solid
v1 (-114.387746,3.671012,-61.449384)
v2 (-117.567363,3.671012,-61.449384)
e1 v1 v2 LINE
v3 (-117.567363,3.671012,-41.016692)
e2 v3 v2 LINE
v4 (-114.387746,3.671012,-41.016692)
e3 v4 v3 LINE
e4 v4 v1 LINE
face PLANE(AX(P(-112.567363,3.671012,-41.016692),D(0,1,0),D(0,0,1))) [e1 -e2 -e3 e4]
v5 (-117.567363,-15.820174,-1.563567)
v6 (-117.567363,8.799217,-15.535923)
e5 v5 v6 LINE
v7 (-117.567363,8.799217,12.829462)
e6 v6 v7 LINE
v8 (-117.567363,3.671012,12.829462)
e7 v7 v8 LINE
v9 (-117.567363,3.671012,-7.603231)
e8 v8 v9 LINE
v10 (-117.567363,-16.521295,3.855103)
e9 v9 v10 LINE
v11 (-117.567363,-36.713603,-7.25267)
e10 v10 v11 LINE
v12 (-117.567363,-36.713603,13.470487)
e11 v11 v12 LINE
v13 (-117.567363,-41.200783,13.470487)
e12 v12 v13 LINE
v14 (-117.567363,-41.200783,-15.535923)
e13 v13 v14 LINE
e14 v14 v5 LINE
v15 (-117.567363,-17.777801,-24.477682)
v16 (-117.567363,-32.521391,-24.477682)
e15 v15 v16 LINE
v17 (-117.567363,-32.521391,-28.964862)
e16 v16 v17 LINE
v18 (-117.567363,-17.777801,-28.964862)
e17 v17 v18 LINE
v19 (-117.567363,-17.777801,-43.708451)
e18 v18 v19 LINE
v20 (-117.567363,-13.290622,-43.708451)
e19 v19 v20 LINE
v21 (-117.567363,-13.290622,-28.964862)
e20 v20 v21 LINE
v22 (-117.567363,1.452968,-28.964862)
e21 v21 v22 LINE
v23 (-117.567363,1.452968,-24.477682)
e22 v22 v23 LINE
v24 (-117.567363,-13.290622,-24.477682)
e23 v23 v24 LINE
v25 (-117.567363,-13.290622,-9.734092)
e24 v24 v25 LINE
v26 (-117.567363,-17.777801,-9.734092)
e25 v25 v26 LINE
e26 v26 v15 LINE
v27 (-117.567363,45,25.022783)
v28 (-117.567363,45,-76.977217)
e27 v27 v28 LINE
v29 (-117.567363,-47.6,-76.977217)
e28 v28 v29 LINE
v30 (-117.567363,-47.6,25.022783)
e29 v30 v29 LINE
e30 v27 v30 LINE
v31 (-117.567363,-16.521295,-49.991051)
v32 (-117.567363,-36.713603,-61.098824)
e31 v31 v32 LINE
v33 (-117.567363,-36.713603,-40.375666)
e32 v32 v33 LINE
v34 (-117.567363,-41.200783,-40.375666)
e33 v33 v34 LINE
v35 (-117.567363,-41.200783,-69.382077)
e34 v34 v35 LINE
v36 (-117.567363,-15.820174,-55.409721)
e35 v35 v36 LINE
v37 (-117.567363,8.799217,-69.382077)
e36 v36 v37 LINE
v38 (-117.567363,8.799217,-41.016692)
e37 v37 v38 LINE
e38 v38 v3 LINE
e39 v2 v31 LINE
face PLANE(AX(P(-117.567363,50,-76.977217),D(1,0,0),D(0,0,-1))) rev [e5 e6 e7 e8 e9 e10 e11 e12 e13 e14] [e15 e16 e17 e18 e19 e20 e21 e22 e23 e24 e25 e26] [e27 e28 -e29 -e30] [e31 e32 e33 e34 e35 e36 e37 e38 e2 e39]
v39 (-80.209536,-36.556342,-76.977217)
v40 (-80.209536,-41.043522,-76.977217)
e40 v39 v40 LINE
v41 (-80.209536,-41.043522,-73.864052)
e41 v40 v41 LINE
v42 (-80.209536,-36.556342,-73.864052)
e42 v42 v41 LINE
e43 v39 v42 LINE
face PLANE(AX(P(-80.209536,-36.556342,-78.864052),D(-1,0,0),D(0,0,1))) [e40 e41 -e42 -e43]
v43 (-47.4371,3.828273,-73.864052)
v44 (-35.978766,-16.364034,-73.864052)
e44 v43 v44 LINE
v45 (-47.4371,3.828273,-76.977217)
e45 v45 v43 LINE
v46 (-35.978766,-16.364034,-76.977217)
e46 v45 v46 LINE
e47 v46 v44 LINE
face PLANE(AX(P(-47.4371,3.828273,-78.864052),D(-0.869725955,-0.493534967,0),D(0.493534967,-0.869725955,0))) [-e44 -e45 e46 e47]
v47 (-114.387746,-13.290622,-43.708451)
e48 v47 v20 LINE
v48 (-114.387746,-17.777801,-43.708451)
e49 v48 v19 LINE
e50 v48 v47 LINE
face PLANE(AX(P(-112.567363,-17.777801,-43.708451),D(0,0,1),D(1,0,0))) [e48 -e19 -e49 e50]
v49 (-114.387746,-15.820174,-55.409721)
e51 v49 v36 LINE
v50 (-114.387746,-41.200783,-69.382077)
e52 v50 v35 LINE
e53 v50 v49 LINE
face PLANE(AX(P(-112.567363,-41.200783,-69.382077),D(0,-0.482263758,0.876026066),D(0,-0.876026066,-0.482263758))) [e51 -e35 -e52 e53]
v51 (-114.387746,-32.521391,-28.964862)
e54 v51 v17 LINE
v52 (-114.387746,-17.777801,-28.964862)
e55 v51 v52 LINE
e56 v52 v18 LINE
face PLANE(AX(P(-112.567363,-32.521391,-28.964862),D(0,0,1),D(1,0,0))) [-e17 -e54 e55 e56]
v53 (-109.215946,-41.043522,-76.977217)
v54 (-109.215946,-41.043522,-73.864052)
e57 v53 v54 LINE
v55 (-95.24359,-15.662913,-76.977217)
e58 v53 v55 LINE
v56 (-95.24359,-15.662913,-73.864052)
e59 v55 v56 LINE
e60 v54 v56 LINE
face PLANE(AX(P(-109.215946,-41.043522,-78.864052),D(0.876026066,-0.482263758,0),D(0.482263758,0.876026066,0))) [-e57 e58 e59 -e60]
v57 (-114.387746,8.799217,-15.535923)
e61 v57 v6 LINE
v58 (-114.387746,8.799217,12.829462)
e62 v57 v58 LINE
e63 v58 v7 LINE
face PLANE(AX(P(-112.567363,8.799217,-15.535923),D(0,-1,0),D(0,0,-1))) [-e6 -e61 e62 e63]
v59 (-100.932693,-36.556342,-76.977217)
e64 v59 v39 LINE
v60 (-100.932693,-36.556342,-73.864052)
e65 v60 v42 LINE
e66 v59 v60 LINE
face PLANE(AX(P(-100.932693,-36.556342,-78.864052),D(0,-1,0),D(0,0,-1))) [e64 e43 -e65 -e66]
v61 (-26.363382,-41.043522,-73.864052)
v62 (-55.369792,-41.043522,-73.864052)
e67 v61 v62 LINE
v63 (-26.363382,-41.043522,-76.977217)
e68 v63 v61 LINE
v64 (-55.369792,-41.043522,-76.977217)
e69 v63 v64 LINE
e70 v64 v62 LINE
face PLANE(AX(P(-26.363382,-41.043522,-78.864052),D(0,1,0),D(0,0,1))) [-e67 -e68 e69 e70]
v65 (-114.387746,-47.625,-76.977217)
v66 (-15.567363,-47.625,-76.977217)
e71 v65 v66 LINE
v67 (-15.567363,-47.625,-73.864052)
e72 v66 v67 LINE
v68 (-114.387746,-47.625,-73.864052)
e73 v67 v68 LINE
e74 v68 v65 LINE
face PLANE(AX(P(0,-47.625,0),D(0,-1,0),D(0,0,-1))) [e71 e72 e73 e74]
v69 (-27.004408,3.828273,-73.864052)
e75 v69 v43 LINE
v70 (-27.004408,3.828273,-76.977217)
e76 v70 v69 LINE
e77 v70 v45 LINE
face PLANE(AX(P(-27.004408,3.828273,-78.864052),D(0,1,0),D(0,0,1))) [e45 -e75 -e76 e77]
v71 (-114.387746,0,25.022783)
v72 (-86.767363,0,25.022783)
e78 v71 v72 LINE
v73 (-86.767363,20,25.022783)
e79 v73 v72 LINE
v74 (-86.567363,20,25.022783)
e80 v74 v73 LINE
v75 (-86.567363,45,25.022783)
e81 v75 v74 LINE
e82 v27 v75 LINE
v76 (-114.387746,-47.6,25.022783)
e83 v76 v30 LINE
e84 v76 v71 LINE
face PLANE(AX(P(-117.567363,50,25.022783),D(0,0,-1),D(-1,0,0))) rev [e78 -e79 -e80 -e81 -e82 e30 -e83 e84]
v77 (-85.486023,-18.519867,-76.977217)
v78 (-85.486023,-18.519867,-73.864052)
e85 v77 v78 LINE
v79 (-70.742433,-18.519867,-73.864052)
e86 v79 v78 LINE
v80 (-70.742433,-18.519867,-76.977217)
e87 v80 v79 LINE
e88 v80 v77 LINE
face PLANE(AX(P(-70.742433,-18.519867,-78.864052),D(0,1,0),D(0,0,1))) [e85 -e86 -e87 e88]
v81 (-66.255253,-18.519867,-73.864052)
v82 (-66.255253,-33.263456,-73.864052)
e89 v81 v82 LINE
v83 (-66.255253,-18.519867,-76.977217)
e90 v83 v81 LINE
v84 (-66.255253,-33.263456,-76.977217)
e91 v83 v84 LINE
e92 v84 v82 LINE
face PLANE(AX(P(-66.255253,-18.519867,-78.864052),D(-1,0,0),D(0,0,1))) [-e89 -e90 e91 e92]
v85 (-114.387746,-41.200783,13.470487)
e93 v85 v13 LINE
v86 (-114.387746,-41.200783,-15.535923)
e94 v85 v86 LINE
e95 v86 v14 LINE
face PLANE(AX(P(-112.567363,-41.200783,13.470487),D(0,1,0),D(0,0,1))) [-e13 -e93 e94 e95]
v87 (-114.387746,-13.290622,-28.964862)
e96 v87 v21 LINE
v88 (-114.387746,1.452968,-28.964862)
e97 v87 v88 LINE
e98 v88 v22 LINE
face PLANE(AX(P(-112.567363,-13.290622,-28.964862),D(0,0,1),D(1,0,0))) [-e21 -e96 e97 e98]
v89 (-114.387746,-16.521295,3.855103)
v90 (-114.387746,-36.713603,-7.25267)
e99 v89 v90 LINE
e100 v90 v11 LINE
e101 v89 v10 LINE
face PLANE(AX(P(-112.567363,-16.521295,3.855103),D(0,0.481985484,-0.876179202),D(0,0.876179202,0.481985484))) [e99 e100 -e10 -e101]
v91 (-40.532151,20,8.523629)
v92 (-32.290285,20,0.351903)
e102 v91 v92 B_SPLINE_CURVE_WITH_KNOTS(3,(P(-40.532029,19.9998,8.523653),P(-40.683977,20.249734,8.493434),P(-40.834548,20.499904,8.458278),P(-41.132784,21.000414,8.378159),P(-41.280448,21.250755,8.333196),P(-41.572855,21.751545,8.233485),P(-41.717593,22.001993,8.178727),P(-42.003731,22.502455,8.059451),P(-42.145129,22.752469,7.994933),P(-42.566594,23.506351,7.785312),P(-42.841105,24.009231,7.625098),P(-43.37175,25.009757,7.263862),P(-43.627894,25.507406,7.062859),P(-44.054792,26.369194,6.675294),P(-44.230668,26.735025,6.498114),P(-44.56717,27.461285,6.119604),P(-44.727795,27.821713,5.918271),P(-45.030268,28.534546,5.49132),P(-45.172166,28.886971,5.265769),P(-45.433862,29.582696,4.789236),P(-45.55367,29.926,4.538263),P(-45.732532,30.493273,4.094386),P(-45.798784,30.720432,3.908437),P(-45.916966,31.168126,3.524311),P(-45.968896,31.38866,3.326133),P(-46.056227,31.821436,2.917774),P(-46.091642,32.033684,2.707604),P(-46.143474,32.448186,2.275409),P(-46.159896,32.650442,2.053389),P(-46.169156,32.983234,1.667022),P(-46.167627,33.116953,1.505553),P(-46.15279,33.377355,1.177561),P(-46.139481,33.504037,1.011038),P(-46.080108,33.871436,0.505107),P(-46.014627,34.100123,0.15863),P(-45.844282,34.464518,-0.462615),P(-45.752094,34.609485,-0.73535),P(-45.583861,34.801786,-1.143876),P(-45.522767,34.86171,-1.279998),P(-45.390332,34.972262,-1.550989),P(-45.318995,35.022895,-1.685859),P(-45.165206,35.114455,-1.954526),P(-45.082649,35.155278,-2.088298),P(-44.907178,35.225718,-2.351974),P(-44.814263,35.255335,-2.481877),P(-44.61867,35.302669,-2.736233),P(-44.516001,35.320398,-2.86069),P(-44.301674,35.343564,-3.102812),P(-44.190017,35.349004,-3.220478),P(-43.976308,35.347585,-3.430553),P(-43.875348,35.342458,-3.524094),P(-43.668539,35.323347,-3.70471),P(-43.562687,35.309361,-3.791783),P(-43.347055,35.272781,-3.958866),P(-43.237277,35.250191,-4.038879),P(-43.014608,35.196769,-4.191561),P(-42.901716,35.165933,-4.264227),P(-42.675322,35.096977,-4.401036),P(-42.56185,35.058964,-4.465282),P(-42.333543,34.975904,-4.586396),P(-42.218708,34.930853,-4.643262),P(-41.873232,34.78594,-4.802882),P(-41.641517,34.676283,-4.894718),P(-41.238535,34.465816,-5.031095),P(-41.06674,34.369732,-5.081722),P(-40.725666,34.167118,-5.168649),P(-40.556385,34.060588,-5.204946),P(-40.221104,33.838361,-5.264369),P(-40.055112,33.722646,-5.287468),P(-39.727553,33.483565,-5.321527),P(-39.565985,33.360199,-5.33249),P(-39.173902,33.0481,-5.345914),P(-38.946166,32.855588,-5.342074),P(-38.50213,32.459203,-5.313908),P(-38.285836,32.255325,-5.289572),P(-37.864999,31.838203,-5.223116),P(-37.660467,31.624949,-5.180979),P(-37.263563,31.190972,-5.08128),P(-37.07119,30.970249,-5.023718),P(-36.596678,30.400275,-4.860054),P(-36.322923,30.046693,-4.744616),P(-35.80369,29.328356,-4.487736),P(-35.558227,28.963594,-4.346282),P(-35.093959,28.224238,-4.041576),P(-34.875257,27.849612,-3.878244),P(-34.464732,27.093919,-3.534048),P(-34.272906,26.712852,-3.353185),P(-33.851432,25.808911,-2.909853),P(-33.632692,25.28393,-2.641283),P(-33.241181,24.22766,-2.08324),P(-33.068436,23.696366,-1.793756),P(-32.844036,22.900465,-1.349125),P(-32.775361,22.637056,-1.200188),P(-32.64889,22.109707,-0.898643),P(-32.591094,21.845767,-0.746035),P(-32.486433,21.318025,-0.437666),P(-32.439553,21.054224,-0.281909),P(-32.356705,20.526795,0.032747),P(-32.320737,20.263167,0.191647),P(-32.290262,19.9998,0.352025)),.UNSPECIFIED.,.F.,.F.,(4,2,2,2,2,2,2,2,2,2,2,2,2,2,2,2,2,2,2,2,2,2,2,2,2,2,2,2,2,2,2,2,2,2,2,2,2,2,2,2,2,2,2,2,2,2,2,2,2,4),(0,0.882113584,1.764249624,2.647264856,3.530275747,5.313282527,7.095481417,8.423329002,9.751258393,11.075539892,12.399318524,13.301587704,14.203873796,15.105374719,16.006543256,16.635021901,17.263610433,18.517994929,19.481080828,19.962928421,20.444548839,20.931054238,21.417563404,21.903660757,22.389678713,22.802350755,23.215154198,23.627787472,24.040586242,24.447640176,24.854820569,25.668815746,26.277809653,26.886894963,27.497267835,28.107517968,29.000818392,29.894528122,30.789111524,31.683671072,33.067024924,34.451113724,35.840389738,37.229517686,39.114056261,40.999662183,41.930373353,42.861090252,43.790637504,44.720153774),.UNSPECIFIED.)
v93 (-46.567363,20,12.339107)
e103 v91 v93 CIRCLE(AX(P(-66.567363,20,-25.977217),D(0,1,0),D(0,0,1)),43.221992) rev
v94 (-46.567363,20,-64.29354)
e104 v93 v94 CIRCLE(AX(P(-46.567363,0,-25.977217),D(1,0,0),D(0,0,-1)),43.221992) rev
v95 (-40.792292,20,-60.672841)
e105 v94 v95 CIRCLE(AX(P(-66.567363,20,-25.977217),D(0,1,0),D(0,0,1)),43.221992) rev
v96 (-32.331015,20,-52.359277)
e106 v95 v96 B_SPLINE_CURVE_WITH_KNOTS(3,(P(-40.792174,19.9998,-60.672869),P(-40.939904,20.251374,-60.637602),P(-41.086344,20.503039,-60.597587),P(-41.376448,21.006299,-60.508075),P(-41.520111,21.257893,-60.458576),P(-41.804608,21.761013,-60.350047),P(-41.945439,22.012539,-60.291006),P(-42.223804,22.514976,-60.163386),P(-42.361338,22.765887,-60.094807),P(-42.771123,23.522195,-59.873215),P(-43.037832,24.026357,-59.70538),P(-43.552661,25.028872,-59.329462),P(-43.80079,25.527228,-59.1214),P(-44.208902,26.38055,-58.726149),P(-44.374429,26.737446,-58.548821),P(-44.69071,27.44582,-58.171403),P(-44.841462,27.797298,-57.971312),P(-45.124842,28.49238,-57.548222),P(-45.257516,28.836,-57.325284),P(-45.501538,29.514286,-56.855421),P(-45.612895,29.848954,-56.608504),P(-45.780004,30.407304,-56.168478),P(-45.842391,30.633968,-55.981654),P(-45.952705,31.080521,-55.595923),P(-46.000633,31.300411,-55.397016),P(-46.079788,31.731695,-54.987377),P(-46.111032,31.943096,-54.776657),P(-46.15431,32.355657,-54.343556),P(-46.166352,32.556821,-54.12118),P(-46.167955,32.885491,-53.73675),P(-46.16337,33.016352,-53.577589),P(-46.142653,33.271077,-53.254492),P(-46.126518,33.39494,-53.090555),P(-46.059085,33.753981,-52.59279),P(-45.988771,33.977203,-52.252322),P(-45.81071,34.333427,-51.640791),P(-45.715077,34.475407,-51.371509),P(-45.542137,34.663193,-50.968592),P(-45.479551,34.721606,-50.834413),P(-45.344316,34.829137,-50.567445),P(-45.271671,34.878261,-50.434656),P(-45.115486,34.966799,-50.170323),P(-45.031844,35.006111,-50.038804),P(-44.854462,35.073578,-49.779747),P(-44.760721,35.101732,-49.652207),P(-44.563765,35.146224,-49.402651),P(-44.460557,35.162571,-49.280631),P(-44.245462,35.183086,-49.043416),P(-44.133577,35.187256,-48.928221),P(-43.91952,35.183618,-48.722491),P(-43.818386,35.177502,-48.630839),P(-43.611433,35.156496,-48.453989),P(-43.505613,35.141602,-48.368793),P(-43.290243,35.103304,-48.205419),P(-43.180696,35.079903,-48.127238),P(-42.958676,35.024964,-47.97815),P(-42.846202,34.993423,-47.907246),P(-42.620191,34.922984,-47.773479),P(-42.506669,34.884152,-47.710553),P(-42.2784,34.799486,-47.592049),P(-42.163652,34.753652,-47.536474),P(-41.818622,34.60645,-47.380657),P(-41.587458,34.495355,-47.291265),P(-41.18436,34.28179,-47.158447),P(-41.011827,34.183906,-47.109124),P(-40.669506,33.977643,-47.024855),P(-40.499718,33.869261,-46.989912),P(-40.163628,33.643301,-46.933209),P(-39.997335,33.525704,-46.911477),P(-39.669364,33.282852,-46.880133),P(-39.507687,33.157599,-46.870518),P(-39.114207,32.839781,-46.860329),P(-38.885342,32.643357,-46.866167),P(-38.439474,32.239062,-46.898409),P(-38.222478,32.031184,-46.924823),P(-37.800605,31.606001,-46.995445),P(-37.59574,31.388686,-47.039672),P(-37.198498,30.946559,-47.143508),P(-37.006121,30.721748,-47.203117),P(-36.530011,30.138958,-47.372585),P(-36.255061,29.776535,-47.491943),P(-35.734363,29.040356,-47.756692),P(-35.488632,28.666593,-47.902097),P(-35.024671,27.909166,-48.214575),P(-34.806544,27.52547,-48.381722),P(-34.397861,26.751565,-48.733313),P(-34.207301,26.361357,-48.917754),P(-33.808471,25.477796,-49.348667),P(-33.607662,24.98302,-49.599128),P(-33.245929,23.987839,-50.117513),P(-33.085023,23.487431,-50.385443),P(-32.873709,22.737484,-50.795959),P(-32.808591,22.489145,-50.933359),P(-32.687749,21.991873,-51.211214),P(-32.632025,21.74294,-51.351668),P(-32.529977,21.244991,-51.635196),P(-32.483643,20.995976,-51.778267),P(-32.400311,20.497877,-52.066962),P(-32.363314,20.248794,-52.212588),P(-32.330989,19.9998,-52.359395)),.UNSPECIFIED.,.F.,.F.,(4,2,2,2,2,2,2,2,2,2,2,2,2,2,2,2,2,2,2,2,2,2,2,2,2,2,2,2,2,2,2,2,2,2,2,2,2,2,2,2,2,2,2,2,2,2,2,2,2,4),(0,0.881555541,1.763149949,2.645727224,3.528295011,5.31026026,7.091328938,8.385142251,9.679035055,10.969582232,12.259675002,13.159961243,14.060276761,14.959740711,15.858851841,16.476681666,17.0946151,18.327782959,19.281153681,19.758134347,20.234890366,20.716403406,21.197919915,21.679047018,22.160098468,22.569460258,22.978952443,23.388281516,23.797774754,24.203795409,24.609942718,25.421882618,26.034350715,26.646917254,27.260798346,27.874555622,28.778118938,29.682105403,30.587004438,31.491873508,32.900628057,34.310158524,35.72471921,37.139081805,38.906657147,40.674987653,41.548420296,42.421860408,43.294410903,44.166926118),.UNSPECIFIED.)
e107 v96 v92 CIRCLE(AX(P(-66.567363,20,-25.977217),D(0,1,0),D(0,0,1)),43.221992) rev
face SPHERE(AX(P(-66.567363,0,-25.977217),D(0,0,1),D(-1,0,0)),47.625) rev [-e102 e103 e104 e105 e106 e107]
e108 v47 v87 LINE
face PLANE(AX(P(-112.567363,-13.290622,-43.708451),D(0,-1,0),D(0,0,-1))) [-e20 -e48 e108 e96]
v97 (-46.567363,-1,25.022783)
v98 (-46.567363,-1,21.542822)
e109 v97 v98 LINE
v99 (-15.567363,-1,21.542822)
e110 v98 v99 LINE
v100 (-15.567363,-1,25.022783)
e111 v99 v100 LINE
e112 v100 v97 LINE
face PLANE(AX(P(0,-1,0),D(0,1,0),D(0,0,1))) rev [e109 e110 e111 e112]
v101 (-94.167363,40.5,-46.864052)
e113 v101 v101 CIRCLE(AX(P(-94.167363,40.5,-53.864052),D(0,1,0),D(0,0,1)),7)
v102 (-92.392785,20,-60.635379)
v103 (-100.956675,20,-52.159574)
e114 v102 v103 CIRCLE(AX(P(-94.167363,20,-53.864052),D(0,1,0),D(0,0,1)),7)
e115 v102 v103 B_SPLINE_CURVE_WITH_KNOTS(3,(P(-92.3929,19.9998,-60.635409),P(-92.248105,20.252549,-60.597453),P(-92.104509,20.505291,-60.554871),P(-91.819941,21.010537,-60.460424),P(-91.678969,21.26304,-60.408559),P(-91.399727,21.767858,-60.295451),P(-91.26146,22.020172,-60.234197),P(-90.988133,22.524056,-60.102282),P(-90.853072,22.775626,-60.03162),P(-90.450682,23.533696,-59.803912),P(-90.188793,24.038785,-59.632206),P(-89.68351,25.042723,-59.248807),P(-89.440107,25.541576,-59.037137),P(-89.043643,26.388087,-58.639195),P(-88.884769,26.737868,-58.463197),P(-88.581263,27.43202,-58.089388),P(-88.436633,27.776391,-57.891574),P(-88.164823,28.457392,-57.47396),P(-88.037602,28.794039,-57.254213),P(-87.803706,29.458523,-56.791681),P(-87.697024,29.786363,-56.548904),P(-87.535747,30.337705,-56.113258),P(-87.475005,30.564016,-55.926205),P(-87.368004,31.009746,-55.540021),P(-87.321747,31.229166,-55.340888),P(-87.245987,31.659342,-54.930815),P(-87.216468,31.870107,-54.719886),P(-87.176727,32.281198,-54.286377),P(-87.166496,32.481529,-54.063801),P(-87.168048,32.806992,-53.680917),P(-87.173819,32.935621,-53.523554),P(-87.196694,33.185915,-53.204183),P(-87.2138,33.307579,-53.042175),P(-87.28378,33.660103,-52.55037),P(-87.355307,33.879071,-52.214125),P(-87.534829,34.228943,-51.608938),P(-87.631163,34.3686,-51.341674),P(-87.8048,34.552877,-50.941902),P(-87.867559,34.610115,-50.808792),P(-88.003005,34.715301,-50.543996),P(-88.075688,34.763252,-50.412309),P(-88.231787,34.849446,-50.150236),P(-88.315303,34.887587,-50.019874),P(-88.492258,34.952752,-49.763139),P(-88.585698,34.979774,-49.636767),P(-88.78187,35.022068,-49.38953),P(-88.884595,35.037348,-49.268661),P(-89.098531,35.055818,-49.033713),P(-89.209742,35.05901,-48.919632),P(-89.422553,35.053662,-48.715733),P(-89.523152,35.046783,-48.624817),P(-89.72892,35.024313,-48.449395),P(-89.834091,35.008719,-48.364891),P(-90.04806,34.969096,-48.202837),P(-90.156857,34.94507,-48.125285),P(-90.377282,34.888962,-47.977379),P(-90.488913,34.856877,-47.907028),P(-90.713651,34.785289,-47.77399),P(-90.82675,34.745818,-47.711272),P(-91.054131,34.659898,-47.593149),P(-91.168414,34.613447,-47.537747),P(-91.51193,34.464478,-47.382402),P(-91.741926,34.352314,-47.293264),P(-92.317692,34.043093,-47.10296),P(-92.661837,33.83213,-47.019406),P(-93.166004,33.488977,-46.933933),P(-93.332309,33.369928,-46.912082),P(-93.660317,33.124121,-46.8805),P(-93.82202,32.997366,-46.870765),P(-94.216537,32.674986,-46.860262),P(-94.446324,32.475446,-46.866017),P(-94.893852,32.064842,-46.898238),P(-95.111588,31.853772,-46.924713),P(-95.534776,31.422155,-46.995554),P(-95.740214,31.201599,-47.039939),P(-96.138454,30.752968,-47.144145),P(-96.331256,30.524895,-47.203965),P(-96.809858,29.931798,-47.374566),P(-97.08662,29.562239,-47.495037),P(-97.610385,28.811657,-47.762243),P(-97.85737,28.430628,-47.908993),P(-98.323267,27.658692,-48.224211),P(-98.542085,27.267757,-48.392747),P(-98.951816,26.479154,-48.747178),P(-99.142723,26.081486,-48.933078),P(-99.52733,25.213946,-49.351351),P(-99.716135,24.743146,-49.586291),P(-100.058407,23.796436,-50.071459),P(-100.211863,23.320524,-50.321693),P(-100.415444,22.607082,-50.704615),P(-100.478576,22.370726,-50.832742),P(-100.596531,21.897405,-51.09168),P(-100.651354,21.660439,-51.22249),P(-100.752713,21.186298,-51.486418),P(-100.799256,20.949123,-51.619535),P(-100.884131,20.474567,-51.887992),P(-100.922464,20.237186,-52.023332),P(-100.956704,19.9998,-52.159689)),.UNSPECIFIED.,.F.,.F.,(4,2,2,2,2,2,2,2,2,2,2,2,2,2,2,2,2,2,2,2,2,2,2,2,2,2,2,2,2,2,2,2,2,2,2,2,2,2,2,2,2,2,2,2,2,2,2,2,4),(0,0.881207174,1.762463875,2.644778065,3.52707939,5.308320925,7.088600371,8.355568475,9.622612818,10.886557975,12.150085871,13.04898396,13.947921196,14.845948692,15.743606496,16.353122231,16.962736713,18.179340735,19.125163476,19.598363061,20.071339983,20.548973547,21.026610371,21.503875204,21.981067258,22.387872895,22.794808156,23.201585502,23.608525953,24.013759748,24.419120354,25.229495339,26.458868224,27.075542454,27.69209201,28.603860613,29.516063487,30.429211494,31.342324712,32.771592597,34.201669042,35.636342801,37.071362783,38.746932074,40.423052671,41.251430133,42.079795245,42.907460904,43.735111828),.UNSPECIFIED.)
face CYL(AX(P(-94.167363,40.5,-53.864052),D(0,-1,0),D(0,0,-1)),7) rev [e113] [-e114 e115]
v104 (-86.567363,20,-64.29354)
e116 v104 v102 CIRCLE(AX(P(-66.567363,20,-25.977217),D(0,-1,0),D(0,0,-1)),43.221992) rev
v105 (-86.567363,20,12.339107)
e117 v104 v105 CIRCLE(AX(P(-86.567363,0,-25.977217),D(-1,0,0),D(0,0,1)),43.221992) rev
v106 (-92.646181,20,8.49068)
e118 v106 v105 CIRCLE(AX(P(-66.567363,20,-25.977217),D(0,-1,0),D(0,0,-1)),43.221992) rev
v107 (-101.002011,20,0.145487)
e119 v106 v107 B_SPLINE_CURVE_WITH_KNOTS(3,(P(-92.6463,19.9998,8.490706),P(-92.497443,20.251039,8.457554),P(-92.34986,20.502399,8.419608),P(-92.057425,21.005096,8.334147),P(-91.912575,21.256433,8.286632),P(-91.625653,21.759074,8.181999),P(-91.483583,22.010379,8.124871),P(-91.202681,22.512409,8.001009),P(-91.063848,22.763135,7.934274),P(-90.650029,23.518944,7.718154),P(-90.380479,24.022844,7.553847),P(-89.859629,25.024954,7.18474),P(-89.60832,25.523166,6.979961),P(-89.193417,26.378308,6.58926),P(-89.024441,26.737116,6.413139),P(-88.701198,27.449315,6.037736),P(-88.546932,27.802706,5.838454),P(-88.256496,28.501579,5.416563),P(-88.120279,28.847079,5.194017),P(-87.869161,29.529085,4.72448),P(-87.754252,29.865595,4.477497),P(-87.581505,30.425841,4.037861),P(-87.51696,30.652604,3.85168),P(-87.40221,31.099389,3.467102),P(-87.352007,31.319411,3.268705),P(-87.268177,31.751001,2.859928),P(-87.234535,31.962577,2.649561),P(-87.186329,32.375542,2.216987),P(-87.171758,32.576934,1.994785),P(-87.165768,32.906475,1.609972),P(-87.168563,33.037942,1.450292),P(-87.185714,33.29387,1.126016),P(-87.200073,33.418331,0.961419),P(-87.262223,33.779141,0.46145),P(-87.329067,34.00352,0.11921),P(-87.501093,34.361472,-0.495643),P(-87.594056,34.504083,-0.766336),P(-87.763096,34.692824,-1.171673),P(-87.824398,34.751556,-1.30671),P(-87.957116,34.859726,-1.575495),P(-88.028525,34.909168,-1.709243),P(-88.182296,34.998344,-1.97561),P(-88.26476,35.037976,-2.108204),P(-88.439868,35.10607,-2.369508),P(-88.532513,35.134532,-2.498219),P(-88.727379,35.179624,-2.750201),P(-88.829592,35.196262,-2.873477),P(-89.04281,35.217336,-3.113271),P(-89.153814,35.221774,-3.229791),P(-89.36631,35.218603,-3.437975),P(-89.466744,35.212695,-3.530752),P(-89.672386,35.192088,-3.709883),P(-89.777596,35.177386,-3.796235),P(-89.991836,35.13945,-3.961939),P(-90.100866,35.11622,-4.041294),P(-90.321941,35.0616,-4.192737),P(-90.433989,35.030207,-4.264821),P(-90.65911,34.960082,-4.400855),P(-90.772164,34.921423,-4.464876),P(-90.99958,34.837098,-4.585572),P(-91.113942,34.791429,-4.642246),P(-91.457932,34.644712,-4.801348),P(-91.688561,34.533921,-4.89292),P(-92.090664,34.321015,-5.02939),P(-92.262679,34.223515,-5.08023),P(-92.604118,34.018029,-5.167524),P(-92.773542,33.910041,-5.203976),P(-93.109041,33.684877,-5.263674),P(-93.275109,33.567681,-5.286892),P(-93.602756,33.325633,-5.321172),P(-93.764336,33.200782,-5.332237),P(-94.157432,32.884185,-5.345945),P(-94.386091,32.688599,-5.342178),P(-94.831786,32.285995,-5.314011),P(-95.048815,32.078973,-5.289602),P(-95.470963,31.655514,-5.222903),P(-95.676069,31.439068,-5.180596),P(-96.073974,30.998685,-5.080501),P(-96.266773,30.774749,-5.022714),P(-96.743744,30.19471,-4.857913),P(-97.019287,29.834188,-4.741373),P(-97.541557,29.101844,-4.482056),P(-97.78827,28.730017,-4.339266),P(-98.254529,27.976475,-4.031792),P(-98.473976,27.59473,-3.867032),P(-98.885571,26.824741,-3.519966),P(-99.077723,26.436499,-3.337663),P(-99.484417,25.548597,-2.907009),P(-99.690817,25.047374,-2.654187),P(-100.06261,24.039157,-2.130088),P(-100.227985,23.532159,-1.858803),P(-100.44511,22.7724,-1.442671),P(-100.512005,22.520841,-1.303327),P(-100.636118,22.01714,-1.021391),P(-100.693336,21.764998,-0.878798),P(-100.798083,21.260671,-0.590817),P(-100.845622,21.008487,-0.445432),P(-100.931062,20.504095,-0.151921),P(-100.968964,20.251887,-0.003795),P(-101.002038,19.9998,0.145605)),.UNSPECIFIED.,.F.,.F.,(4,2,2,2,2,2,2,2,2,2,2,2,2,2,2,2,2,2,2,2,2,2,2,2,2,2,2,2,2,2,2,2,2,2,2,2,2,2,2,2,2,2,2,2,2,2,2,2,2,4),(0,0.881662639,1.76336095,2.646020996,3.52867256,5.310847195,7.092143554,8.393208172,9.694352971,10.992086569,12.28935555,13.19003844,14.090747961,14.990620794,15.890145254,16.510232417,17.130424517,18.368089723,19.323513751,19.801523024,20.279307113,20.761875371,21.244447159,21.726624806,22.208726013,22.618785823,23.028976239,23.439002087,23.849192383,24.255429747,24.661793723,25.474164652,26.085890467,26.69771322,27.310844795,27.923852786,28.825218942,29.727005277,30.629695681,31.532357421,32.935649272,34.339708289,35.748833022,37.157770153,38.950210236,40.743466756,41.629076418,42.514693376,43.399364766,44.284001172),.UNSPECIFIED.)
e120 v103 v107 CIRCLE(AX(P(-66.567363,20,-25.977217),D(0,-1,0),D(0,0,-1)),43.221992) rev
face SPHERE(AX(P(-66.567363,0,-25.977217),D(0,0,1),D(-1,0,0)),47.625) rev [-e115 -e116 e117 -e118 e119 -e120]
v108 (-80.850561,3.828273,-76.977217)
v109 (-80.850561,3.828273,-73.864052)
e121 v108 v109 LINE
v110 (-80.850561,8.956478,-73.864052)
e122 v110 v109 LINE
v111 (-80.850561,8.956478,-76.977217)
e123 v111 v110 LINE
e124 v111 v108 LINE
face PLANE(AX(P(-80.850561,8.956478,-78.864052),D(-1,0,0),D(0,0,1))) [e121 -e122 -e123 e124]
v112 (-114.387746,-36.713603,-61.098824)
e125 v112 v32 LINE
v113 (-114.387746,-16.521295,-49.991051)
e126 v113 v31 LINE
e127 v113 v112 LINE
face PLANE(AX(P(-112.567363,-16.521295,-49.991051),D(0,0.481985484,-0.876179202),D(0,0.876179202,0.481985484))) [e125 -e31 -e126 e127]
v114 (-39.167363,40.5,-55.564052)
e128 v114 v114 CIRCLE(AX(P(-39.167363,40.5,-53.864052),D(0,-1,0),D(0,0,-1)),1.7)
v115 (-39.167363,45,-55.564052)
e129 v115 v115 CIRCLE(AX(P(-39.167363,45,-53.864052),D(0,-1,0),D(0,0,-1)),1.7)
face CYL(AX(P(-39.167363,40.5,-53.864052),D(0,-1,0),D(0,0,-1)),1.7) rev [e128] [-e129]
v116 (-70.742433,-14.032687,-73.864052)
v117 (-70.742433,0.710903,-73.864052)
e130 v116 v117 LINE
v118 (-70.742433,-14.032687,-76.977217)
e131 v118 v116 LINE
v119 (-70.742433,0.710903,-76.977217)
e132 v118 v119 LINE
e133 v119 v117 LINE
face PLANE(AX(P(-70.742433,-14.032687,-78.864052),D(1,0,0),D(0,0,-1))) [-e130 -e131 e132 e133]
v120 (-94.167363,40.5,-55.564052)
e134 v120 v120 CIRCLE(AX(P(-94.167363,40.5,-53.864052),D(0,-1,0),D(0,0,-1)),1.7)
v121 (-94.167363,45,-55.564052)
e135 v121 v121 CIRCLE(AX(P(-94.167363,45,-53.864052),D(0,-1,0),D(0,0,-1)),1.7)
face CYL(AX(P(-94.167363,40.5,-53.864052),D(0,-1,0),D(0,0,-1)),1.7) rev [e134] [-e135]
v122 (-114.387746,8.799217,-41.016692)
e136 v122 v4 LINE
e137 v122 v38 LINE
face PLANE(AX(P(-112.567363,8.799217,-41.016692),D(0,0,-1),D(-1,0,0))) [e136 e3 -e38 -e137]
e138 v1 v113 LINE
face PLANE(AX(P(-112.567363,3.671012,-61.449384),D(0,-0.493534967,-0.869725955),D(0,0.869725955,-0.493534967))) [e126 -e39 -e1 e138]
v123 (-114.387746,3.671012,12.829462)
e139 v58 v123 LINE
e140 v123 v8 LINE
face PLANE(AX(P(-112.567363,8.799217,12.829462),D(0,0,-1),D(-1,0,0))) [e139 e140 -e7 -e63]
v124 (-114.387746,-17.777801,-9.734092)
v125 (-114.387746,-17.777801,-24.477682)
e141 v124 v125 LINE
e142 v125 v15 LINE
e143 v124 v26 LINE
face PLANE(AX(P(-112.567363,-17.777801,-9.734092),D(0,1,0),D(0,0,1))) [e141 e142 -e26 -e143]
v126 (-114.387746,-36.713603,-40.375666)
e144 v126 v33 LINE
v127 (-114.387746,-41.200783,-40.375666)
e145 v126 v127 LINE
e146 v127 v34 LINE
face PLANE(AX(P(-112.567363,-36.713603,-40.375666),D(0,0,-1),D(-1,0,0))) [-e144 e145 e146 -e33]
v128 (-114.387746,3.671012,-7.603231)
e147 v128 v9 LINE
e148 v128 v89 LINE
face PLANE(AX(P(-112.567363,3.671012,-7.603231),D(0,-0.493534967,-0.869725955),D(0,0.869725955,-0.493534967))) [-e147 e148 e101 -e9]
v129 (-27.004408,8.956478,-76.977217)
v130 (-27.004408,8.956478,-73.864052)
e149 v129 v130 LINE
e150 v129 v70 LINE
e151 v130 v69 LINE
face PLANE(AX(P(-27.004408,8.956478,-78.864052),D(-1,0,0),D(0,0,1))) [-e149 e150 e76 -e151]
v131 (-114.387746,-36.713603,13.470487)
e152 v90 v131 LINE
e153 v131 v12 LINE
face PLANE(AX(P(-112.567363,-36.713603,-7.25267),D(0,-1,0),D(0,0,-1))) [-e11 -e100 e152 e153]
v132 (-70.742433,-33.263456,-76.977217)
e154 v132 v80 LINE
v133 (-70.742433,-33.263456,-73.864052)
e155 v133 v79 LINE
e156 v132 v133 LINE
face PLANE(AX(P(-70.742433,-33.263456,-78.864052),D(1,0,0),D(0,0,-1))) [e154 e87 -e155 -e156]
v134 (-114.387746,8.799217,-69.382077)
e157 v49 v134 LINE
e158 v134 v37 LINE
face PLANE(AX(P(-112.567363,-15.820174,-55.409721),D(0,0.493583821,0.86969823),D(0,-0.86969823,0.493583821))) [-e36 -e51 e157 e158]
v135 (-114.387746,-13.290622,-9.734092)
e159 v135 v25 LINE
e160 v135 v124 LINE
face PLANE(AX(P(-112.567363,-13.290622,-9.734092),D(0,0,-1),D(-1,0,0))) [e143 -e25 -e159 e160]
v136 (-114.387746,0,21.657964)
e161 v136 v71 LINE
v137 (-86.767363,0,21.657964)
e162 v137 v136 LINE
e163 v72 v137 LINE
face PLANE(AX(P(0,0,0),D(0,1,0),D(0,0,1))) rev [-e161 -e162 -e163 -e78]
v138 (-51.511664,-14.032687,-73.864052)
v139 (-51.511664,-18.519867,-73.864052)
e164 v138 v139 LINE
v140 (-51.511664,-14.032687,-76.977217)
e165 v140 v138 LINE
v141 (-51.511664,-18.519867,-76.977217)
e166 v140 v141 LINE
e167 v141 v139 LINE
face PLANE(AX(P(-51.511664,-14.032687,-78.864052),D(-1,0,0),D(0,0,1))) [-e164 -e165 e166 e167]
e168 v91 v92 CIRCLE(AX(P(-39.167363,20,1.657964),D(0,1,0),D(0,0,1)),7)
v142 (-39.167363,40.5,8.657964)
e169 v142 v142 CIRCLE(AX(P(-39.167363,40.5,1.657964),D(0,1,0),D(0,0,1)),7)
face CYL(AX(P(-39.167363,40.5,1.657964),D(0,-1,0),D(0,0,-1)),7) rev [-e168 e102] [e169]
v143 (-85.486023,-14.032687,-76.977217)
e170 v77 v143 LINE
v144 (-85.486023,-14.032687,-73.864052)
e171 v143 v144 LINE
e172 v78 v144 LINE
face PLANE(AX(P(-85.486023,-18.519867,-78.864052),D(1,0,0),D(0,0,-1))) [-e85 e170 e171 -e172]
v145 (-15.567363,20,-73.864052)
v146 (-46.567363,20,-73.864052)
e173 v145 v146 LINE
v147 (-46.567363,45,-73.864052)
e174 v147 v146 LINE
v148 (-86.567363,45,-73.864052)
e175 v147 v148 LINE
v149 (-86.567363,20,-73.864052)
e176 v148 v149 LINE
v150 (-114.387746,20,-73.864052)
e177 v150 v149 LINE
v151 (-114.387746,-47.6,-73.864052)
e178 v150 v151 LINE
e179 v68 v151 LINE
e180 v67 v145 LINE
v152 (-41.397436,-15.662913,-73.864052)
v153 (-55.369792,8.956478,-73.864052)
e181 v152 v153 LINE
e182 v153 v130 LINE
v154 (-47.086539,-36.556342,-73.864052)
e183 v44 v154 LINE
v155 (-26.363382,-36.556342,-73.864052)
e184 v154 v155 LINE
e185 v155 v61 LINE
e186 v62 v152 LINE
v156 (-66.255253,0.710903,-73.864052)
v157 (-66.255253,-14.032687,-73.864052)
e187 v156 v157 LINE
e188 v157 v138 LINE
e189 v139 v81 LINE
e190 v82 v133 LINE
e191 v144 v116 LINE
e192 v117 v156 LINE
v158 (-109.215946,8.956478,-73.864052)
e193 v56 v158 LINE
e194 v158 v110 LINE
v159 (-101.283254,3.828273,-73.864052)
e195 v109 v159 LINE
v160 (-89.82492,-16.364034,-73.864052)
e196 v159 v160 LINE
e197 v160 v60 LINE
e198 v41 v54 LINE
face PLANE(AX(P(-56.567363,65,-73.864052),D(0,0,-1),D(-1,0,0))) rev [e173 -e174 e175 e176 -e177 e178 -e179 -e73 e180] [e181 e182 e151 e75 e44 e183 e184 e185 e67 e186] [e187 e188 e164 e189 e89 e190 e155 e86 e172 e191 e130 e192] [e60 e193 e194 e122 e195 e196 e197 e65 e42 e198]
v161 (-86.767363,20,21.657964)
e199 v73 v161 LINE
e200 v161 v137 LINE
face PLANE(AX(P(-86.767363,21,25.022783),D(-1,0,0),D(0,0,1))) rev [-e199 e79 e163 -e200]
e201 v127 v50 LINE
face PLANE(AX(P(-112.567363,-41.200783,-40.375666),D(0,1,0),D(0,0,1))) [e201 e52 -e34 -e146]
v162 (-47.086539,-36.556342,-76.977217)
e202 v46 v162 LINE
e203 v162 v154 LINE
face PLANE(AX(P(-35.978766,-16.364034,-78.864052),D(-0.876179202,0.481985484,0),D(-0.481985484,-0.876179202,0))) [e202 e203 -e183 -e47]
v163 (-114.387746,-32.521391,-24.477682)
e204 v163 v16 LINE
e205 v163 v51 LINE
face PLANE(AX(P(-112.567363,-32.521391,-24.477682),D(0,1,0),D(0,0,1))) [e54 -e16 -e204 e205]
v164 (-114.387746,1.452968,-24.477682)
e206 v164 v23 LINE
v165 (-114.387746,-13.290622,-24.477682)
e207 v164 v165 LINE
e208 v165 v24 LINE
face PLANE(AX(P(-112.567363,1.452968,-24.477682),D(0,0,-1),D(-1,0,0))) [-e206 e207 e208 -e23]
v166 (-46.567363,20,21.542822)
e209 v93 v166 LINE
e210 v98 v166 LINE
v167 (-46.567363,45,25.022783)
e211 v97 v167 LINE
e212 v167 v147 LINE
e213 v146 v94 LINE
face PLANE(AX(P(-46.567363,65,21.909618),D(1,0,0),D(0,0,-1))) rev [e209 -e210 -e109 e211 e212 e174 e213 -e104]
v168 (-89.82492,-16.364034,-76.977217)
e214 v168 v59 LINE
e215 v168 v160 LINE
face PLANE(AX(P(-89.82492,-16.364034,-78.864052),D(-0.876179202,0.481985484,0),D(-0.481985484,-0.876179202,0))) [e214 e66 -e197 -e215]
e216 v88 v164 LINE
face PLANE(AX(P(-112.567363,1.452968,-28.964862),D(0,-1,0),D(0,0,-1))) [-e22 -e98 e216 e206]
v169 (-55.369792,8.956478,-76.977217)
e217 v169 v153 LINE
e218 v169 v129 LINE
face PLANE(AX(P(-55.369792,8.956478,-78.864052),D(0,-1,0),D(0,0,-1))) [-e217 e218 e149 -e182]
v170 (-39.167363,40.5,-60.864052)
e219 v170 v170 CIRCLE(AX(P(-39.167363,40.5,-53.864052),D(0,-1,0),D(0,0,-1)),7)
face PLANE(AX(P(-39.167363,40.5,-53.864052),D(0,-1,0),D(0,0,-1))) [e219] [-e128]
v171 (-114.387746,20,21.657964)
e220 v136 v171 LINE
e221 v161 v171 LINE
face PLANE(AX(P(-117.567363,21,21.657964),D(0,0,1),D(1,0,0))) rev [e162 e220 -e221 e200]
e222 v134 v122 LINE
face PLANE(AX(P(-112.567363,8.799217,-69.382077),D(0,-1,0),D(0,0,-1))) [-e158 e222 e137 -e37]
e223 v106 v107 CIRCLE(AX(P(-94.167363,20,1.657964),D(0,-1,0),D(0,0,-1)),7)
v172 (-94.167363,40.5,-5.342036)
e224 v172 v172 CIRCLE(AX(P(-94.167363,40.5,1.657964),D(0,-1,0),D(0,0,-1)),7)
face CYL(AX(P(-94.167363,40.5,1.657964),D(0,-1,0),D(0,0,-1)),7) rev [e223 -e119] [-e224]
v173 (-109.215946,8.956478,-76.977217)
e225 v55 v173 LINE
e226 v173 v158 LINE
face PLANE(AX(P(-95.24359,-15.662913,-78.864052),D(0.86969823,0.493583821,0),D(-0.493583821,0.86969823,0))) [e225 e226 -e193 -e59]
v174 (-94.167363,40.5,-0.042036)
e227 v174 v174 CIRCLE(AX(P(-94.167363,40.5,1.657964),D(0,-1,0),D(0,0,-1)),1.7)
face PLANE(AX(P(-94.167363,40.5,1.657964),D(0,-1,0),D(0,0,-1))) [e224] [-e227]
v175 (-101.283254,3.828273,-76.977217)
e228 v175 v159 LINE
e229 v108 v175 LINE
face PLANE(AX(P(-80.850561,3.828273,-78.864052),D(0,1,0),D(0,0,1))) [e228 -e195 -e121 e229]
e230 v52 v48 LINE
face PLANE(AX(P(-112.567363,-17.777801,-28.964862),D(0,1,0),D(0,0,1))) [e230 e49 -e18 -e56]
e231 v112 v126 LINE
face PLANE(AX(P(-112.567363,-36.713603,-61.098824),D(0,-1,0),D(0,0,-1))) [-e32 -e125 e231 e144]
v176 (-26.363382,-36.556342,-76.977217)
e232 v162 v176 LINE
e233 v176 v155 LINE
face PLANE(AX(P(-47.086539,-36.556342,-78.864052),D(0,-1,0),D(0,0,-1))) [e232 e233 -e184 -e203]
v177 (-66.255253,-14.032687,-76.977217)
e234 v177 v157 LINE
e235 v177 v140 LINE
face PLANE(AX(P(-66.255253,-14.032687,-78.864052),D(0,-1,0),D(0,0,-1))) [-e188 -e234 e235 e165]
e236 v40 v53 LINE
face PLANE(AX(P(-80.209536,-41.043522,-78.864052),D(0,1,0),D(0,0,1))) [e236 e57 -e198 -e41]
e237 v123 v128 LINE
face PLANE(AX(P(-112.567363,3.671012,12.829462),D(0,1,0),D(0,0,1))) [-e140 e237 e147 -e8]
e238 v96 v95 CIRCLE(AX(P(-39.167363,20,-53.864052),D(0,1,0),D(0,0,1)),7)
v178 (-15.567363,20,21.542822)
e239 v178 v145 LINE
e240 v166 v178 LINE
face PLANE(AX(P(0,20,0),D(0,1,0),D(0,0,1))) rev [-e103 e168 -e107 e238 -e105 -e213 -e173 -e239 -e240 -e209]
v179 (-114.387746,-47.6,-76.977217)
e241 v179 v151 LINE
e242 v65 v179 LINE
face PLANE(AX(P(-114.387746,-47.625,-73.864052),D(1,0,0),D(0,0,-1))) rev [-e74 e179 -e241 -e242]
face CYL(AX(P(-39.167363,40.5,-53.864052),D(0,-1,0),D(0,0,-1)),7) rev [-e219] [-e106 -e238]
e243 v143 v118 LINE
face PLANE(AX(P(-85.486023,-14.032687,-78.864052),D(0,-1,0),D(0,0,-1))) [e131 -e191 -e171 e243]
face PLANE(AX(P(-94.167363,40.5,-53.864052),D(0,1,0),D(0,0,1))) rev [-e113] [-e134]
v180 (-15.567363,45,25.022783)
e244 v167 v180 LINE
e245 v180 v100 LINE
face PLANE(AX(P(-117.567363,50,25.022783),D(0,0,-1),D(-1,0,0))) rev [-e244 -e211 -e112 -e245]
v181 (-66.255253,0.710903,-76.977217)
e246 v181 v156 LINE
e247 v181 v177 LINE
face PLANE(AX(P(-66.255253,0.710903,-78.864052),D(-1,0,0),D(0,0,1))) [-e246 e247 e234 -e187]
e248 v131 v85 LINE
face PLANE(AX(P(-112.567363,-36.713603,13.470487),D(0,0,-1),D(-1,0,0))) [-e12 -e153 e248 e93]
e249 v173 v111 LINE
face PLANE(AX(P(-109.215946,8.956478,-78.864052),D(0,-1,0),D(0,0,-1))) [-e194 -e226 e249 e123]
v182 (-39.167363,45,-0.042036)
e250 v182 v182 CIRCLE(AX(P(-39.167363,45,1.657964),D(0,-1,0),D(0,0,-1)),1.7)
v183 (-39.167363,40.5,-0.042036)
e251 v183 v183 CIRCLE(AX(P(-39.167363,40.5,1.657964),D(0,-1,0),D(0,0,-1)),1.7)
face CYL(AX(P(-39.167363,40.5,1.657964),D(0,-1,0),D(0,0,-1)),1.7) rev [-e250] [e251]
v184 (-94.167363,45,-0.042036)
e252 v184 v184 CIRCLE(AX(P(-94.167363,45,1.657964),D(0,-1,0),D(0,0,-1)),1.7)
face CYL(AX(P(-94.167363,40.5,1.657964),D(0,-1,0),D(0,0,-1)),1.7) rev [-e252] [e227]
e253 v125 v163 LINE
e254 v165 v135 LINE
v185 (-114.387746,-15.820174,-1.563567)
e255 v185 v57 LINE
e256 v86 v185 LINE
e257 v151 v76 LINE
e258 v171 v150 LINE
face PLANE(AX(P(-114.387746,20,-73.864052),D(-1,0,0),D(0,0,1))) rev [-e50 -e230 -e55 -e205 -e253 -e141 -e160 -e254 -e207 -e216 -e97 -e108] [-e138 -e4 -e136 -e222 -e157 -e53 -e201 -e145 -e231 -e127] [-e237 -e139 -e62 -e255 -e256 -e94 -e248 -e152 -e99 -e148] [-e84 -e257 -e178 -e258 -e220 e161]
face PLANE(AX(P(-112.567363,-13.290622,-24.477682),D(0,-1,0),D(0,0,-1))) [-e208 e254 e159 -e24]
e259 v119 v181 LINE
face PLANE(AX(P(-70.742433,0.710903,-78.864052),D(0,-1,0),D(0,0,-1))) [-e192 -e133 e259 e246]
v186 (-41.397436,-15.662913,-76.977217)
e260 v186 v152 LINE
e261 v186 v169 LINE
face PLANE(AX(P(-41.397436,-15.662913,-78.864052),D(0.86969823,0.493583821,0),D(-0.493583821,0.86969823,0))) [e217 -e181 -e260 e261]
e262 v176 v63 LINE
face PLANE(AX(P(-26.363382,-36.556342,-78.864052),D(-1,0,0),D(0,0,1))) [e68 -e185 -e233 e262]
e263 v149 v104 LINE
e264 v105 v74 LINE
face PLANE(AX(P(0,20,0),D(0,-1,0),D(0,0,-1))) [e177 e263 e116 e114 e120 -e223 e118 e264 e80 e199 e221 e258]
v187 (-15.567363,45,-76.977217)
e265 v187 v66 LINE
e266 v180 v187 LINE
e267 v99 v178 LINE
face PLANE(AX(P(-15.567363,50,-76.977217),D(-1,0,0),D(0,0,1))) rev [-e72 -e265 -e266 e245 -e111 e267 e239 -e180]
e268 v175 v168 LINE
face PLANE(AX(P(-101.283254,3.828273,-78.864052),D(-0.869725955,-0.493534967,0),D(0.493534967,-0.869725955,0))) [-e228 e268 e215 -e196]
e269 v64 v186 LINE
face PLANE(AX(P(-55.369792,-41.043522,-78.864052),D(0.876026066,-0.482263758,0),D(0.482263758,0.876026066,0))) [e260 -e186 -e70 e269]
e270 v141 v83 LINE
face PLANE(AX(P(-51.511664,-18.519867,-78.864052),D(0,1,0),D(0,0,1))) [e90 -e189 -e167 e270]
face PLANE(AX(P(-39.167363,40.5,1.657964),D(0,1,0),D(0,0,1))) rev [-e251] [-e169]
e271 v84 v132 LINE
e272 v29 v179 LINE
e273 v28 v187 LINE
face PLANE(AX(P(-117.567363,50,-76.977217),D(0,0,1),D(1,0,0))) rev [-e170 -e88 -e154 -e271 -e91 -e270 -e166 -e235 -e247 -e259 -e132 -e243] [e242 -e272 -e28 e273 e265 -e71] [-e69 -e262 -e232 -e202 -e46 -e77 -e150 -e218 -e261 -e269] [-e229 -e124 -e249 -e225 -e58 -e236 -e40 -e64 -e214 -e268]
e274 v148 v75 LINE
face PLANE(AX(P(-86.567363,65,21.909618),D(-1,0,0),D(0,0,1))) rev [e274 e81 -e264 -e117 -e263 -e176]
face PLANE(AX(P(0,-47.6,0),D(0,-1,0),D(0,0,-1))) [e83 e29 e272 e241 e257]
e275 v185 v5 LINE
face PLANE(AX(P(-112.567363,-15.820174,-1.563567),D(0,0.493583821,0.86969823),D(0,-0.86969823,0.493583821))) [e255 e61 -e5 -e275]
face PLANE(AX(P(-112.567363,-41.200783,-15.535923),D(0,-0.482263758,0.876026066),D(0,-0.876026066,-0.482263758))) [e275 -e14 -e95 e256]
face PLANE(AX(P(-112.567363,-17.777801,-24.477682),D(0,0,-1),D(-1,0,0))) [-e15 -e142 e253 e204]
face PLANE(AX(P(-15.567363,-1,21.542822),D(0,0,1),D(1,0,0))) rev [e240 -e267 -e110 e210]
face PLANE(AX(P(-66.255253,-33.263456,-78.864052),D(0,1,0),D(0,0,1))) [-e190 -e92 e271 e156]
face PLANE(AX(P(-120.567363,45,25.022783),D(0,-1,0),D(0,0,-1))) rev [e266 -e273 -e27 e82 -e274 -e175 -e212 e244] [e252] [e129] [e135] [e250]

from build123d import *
from build123d.topology import SkipClean

# Parameters (mm, degrees)
SKETCH1_W                   = 102
SKETCH1_H                   = 102
BOSS_EXTRUDE1_DEPTH         = 50
CUT_EXTRUDE_THIN1_OUTLINE_W = 40
CUT_EXTRUDE_THIN1_OUTLINE_H = 95.773670058
CUT_EXTRUDE_THIN1_DEPTH     = 50
SKETCH4_W                   = 40
SKETCH4_H                   = 6.202657501
CUT_EXTRUDE3_DEPTH          = 54
SKETCH5_W                   = 33.817621941
SKETCH5_H                   = 102.594578927
CUT_EXTRUDE4_DEPTH          = 20
SKETCH6_W                   = 27.820383201
SKETCH6_H                   = 98.886835029
CUT_EXTRUDE5_DEPTH          = 20
SKETCH7_W                   = 30.8
SKETCH7_H                   = 3.364819678
BOSS_EXTRUDE2_DEPTH         = 21
SKETCH9_W                   = 31
SKETCH9_H                   = 3.479961613
BOSS_EXTRUDE4_DEPTH         = 21
SKETCH11_W                  = 98.820383201
SKETCH11_H                  = 3.113164971
BOSS_EXTRUDE6_DEPTH         = 47.625
SKETCH14_W                  = 102
SKETCH14_H                  = 5
CUT_EXTRUDE7_DEPTH          = 105
SKETCH17_R                  = 7
CUT_EXTRUDE12_DEPTH         = 20.5
M3_CLEARANCE_HOLE1_D        = 3.4
SKETCH22_W                  = 3.179616799
SKETCH22_H                  = 102
BOSS_EXTRUDE7_DEPTH         = 47.6
CUT_EXTRUDE13_DEPTH         = 5
CUT_EXTRUDE14_DEPTH         = 5
CUT_EXTRUDE16_DEPTH         = 5


# Read off the part's stored shape, not the designer's step: Cut-Extrude-Thin1
with BuildPart() as part:
    # Sketch1 → Boss-Extrude1 (new body)
    with BuildSketch(Plane(origin=(0, 0, 0), x_dir=(1, 0, 0), z_dir=(0, 1, 0))):
        with Locations((-66.567363259, 25.977216604)):
            Rectangle(SKETCH1_W, SKETCH1_H)
    extrude(amount=BOSS_EXTRUDE1_DEPTH)

    # Sketch2 → Cut-Revolve1 (revolve, cut)
    with SkipClean():  # the faces are left unmerged after this step: merging them gives an invalid solid
        with BuildSketch(Plane(origin=(0, 0, 0), x_dir=(1, 0, 0), z_dir=(0, 1, 0))):
            with BuildLine():
                ThreePointArc((-66.567363259, 73.602216604), (-114.192363259, 25.977216604), (-66.567363259, -21.647783396))
                Line((-66.567363259, -21.647783396), (-66.567363259, 73.602216604))
            make_face()
            with BuildLine():
                Line((-66.567363259, 73.602216604), (-66.567363259, -21.647783396))
                ThreePointArc((-66.567363259, -21.647783396), (-32.891402805, -7.69874385), (-18.942363259, 25.977216604))
                ThreePointArc((-18.942363259, 25.977216604), (-32.891402805, 59.653177058), (-66.567363259, 73.602216604))
            make_face()
        revolve(axis=Axis((-66.567363259, 0, 21.647783396), (0, 0, -1)), mode=Mode.SUBTRACT)
    add(part.part.scale(1), mode=Mode.REPLACE)  # the faces are merged on a copy

    # Cut-Extrude-Thin1 outline → Cut-Extrude-Thin1 (cut)
    with BuildSketch(Plane(origin=(0, 0, 0), x_dir=(1, 0, 0), z_dir=(0, 1, 0))):
        with Locations((-66.567363259, 25.977216604)):
            Rectangle(CUT_EXTRUDE_THIN1_OUTLINE_W, CUT_EXTRUDE_THIN1_OUTLINE_H)
    extrude(amount=CUT_EXTRUDE_THIN1_DEPTH, mode=Mode.SUBTRACT)

    # Sketch4 → Cut-Extrude3 (cut)
    with BuildSketch(Plane(origin=(0, 0, 0), x_dir=(1, 0, 0), z_dir=(0, 1, 0))):
        with Locations((-66.567363259, -25.010947176)):
            Rectangle(SKETCH4_W, SKETCH4_H)
    extrude(amount=CUT_EXTRUDE3_DEPTH, mode=Mode.SUBTRACT)

    # Sketch5 → Cut-Extrude4 (cut)
    with BuildSketch(Plane(origin=(0, 0, 0), x_dir=(1, 0, 0), z_dir=(0, 1, 0))):
        with Locations((-29.658552289, 22.56676217)):
            Rectangle(SKETCH5_W, SKETCH5_H)
    extrude(amount=CUT_EXTRUDE4_DEPTH, mode=Mode.SUBTRACT)

    # Sketch6 → Cut-Extrude5 (cut)
    with BuildSketch(Plane(origin=(0, 0, 0), x_dir=(-1, 0, 0), z_dir=(0, -1, 0))):
        with Locations((100.47755486, 24.420634119)):
            Rectangle(SKETCH6_W, SKETCH6_H)
    extrude(amount=-CUT_EXTRUDE5_DEPTH, mode=Mode.SUBTRACT)

    # Sketch7 → Boss-Extrude2 (add)
    with BuildSketch(Plane(origin=(0, 0, 0), x_dir=(1, 0, 0), z_dir=(0, 1, 0))):
        with Locations((-102.167363259, -23.340373557)):
            Rectangle(SKETCH7_W, SKETCH7_H)
    extrude(amount=BOSS_EXTRUDE2_DEPTH)

    # Sketch9 → Boss-Extrude4 (add)
    with BuildSketch(Plane.XZ.offset(-20)):
        with Locations((-31.067363259, 23.28280259)):
            Rectangle(SKETCH9_W, SKETCH9_H)
    extrude(amount=BOSS_EXTRUDE4_DEPTH)

    # Sketch11 → Boss-Extrude6 (add)
    with BuildSketch(Plane.XZ):
        with Locations((-64.97755486, -75.420634119)):
            Rectangle(SKETCH11_W, SKETCH11_H)
    extrude(amount=BOSS_EXTRUDE6_DEPTH)

    # Sketch14 → Cut-Extrude7 (cut)
    with BuildSketch(Plane(origin=(-15.567363259, 0, 0), x_dir=(0, 0, -1), z_dir=(1, 0, 0))):
        with Locations((25.977216604, 47.5)):
            Rectangle(SKETCH14_W, SKETCH14_H)
    extrude(amount=-CUT_EXTRUDE7_DEPTH, mode=Mode.SUBTRACT)

    # Sketch17 → Cut-Extrude12 (cut)
    with BuildSketch(Plane.XZ.offset(-20)):
        with Locations(Location((-94.167363259, 1.657963718, 0), (0, 0, 270))):
            Circle(SKETCH17_R)
        with Locations(Location((-94.167363259, -53.864051633, 0), (0, 0, 284.685382437))):
            Circle(SKETCH17_R)
        with Locations(Location((-39.167363259, 1.657963718, 0), (0, 0, 349.246729183))):
            Circle(SKETCH17_R)
        with Locations(Location((-39.167363259, -53.864051633, 0), (0, 0, 270))):
            Circle(SKETCH17_R)
    extrude(amount=-CUT_EXTRUDE12_DEPTH, mode=Mode.SUBTRACT)

    # M3 Clearance Hole1 (through all)
    with Locations(Plane(origin=(0, 40.5, 0), x_dir=(-1, 0, 0), z_dir=(0, -1, 0))):
        with Locations((94.167363259, -1.657963718), (39.167363259, -1.657963718), (39.167363259, 53.864051633), (94.167363259, 53.864051633)):
            Hole(M3_CLEARANCE_HOLE1_D / 2)

    # Sketch22 → Boss-Extrude7 (add)
    with BuildSketch(Plane.XZ):
        with Locations((-115.97755486, -25.977216604)):
            Rectangle(SKETCH22_W, SKETCH22_H)
    extrude(amount=BOSS_EXTRUDE7_DEPTH)

    # Sketch23 → Cut-Extrude13 (cut)
    with BuildSketch(Plane.XY.offset(-73.864051633)):
        Polygon((-80.20953571, -41.043521661), (-109.215945966, -41.043521661), (-95.243590197, -15.662912687), (-109.215945966, 8.956478339), (-80.850561351, 8.956478339), (-80.850561351, 3.828273211), (-101.283253659, 3.828273211), (-89.824920325, -16.364034482), (-100.932692761, -36.556342174), (-80.20953571, -36.556342174), align=None)
        Polygon((-26.363381864, -41.043521661), (-55.36979212, -41.043521661), (-41.397436351, -15.662912687), (-55.36979212, 8.956478339), (-27.004407505, 8.956478339), (-27.004407505, 3.828273211), (-47.437099813, 3.828273211), (-35.978766479, -16.364034482), (-47.086538915, -36.556342174), (-26.363381864, -36.556342174), align=None)
    extrude(amount=-CUT_EXTRUDE13_DEPTH, mode=Mode.SUBTRACT)

    # Sketch24 → Cut-Extrude14 (cut)
    with BuildSketch(Plane.XY.offset(-73.864051633)):
        Polygon((-70.742432906, -14.032687035), (-70.742432906, 0.710902709), (-66.255253419, 0.710902709), (-66.255253419, -14.032687035), (-51.511663676, -14.032687035), (-51.511663676, -18.519866522), (-66.255253419, -18.519866522), (-66.255253419, -33.263456266), (-70.742432906, -33.263456266), (-70.742432906, -18.519866522), (-85.48602265, -18.519866522), (-85.48602265, -14.032687035), align=None)
    extrude(amount=-CUT_EXTRUDE14_DEPTH, mode=Mode.SUBTRACT)

    # Sketch25 → Cut-Extrude16 (cut)
    with BuildSketch(Plane.ZY.offset(117.567363259)):
        Polygon((-40.375666466, -41.200782652), (-69.382076723, -41.200782652), (-55.409720954, -15.820173678), (-69.382076723, 8.799217348), (-41.016692107, 8.799217348), (-41.016692107, 3.67101222), (-61.449384415, 3.67101222), (-49.991051082, -16.521295473), (-61.098823518, -36.713603165), (-40.375666466, -36.713603165), align=None)
        Polygon((13.47048738, -41.200782652), (-15.535922877, -41.200782652), (-1.563567107, -15.820173678), (-15.535922877, 8.799217348), (12.829461739, 8.799217348), (12.829461739, 3.67101222), (-7.603230569, 3.67101222), (3.855102764, -16.521295473), (-7.252669672, -36.713603165), (13.47048738, -36.713603165), align=None)
        Polygon((-28.964861623, -13.290621763), (-28.964861623, 1.452967981), (-24.477682136, 1.452967981), (-24.477682136, -13.290621763), (-9.734092392, -13.290621763), (-9.734092392, -17.77780125), (-24.477682136, -17.77780125), (-24.477682136, -32.521390994), (-28.964861623, -32.521390994), (-28.964861623, -17.77780125), (-43.708451366, -17.77780125), (-43.708451366, -13.290621763), align=None)
    extrude(amount=-CUT_EXTRUDE16_DEPTH, mode=Mode.SUBTRACT)


solid = part.part
